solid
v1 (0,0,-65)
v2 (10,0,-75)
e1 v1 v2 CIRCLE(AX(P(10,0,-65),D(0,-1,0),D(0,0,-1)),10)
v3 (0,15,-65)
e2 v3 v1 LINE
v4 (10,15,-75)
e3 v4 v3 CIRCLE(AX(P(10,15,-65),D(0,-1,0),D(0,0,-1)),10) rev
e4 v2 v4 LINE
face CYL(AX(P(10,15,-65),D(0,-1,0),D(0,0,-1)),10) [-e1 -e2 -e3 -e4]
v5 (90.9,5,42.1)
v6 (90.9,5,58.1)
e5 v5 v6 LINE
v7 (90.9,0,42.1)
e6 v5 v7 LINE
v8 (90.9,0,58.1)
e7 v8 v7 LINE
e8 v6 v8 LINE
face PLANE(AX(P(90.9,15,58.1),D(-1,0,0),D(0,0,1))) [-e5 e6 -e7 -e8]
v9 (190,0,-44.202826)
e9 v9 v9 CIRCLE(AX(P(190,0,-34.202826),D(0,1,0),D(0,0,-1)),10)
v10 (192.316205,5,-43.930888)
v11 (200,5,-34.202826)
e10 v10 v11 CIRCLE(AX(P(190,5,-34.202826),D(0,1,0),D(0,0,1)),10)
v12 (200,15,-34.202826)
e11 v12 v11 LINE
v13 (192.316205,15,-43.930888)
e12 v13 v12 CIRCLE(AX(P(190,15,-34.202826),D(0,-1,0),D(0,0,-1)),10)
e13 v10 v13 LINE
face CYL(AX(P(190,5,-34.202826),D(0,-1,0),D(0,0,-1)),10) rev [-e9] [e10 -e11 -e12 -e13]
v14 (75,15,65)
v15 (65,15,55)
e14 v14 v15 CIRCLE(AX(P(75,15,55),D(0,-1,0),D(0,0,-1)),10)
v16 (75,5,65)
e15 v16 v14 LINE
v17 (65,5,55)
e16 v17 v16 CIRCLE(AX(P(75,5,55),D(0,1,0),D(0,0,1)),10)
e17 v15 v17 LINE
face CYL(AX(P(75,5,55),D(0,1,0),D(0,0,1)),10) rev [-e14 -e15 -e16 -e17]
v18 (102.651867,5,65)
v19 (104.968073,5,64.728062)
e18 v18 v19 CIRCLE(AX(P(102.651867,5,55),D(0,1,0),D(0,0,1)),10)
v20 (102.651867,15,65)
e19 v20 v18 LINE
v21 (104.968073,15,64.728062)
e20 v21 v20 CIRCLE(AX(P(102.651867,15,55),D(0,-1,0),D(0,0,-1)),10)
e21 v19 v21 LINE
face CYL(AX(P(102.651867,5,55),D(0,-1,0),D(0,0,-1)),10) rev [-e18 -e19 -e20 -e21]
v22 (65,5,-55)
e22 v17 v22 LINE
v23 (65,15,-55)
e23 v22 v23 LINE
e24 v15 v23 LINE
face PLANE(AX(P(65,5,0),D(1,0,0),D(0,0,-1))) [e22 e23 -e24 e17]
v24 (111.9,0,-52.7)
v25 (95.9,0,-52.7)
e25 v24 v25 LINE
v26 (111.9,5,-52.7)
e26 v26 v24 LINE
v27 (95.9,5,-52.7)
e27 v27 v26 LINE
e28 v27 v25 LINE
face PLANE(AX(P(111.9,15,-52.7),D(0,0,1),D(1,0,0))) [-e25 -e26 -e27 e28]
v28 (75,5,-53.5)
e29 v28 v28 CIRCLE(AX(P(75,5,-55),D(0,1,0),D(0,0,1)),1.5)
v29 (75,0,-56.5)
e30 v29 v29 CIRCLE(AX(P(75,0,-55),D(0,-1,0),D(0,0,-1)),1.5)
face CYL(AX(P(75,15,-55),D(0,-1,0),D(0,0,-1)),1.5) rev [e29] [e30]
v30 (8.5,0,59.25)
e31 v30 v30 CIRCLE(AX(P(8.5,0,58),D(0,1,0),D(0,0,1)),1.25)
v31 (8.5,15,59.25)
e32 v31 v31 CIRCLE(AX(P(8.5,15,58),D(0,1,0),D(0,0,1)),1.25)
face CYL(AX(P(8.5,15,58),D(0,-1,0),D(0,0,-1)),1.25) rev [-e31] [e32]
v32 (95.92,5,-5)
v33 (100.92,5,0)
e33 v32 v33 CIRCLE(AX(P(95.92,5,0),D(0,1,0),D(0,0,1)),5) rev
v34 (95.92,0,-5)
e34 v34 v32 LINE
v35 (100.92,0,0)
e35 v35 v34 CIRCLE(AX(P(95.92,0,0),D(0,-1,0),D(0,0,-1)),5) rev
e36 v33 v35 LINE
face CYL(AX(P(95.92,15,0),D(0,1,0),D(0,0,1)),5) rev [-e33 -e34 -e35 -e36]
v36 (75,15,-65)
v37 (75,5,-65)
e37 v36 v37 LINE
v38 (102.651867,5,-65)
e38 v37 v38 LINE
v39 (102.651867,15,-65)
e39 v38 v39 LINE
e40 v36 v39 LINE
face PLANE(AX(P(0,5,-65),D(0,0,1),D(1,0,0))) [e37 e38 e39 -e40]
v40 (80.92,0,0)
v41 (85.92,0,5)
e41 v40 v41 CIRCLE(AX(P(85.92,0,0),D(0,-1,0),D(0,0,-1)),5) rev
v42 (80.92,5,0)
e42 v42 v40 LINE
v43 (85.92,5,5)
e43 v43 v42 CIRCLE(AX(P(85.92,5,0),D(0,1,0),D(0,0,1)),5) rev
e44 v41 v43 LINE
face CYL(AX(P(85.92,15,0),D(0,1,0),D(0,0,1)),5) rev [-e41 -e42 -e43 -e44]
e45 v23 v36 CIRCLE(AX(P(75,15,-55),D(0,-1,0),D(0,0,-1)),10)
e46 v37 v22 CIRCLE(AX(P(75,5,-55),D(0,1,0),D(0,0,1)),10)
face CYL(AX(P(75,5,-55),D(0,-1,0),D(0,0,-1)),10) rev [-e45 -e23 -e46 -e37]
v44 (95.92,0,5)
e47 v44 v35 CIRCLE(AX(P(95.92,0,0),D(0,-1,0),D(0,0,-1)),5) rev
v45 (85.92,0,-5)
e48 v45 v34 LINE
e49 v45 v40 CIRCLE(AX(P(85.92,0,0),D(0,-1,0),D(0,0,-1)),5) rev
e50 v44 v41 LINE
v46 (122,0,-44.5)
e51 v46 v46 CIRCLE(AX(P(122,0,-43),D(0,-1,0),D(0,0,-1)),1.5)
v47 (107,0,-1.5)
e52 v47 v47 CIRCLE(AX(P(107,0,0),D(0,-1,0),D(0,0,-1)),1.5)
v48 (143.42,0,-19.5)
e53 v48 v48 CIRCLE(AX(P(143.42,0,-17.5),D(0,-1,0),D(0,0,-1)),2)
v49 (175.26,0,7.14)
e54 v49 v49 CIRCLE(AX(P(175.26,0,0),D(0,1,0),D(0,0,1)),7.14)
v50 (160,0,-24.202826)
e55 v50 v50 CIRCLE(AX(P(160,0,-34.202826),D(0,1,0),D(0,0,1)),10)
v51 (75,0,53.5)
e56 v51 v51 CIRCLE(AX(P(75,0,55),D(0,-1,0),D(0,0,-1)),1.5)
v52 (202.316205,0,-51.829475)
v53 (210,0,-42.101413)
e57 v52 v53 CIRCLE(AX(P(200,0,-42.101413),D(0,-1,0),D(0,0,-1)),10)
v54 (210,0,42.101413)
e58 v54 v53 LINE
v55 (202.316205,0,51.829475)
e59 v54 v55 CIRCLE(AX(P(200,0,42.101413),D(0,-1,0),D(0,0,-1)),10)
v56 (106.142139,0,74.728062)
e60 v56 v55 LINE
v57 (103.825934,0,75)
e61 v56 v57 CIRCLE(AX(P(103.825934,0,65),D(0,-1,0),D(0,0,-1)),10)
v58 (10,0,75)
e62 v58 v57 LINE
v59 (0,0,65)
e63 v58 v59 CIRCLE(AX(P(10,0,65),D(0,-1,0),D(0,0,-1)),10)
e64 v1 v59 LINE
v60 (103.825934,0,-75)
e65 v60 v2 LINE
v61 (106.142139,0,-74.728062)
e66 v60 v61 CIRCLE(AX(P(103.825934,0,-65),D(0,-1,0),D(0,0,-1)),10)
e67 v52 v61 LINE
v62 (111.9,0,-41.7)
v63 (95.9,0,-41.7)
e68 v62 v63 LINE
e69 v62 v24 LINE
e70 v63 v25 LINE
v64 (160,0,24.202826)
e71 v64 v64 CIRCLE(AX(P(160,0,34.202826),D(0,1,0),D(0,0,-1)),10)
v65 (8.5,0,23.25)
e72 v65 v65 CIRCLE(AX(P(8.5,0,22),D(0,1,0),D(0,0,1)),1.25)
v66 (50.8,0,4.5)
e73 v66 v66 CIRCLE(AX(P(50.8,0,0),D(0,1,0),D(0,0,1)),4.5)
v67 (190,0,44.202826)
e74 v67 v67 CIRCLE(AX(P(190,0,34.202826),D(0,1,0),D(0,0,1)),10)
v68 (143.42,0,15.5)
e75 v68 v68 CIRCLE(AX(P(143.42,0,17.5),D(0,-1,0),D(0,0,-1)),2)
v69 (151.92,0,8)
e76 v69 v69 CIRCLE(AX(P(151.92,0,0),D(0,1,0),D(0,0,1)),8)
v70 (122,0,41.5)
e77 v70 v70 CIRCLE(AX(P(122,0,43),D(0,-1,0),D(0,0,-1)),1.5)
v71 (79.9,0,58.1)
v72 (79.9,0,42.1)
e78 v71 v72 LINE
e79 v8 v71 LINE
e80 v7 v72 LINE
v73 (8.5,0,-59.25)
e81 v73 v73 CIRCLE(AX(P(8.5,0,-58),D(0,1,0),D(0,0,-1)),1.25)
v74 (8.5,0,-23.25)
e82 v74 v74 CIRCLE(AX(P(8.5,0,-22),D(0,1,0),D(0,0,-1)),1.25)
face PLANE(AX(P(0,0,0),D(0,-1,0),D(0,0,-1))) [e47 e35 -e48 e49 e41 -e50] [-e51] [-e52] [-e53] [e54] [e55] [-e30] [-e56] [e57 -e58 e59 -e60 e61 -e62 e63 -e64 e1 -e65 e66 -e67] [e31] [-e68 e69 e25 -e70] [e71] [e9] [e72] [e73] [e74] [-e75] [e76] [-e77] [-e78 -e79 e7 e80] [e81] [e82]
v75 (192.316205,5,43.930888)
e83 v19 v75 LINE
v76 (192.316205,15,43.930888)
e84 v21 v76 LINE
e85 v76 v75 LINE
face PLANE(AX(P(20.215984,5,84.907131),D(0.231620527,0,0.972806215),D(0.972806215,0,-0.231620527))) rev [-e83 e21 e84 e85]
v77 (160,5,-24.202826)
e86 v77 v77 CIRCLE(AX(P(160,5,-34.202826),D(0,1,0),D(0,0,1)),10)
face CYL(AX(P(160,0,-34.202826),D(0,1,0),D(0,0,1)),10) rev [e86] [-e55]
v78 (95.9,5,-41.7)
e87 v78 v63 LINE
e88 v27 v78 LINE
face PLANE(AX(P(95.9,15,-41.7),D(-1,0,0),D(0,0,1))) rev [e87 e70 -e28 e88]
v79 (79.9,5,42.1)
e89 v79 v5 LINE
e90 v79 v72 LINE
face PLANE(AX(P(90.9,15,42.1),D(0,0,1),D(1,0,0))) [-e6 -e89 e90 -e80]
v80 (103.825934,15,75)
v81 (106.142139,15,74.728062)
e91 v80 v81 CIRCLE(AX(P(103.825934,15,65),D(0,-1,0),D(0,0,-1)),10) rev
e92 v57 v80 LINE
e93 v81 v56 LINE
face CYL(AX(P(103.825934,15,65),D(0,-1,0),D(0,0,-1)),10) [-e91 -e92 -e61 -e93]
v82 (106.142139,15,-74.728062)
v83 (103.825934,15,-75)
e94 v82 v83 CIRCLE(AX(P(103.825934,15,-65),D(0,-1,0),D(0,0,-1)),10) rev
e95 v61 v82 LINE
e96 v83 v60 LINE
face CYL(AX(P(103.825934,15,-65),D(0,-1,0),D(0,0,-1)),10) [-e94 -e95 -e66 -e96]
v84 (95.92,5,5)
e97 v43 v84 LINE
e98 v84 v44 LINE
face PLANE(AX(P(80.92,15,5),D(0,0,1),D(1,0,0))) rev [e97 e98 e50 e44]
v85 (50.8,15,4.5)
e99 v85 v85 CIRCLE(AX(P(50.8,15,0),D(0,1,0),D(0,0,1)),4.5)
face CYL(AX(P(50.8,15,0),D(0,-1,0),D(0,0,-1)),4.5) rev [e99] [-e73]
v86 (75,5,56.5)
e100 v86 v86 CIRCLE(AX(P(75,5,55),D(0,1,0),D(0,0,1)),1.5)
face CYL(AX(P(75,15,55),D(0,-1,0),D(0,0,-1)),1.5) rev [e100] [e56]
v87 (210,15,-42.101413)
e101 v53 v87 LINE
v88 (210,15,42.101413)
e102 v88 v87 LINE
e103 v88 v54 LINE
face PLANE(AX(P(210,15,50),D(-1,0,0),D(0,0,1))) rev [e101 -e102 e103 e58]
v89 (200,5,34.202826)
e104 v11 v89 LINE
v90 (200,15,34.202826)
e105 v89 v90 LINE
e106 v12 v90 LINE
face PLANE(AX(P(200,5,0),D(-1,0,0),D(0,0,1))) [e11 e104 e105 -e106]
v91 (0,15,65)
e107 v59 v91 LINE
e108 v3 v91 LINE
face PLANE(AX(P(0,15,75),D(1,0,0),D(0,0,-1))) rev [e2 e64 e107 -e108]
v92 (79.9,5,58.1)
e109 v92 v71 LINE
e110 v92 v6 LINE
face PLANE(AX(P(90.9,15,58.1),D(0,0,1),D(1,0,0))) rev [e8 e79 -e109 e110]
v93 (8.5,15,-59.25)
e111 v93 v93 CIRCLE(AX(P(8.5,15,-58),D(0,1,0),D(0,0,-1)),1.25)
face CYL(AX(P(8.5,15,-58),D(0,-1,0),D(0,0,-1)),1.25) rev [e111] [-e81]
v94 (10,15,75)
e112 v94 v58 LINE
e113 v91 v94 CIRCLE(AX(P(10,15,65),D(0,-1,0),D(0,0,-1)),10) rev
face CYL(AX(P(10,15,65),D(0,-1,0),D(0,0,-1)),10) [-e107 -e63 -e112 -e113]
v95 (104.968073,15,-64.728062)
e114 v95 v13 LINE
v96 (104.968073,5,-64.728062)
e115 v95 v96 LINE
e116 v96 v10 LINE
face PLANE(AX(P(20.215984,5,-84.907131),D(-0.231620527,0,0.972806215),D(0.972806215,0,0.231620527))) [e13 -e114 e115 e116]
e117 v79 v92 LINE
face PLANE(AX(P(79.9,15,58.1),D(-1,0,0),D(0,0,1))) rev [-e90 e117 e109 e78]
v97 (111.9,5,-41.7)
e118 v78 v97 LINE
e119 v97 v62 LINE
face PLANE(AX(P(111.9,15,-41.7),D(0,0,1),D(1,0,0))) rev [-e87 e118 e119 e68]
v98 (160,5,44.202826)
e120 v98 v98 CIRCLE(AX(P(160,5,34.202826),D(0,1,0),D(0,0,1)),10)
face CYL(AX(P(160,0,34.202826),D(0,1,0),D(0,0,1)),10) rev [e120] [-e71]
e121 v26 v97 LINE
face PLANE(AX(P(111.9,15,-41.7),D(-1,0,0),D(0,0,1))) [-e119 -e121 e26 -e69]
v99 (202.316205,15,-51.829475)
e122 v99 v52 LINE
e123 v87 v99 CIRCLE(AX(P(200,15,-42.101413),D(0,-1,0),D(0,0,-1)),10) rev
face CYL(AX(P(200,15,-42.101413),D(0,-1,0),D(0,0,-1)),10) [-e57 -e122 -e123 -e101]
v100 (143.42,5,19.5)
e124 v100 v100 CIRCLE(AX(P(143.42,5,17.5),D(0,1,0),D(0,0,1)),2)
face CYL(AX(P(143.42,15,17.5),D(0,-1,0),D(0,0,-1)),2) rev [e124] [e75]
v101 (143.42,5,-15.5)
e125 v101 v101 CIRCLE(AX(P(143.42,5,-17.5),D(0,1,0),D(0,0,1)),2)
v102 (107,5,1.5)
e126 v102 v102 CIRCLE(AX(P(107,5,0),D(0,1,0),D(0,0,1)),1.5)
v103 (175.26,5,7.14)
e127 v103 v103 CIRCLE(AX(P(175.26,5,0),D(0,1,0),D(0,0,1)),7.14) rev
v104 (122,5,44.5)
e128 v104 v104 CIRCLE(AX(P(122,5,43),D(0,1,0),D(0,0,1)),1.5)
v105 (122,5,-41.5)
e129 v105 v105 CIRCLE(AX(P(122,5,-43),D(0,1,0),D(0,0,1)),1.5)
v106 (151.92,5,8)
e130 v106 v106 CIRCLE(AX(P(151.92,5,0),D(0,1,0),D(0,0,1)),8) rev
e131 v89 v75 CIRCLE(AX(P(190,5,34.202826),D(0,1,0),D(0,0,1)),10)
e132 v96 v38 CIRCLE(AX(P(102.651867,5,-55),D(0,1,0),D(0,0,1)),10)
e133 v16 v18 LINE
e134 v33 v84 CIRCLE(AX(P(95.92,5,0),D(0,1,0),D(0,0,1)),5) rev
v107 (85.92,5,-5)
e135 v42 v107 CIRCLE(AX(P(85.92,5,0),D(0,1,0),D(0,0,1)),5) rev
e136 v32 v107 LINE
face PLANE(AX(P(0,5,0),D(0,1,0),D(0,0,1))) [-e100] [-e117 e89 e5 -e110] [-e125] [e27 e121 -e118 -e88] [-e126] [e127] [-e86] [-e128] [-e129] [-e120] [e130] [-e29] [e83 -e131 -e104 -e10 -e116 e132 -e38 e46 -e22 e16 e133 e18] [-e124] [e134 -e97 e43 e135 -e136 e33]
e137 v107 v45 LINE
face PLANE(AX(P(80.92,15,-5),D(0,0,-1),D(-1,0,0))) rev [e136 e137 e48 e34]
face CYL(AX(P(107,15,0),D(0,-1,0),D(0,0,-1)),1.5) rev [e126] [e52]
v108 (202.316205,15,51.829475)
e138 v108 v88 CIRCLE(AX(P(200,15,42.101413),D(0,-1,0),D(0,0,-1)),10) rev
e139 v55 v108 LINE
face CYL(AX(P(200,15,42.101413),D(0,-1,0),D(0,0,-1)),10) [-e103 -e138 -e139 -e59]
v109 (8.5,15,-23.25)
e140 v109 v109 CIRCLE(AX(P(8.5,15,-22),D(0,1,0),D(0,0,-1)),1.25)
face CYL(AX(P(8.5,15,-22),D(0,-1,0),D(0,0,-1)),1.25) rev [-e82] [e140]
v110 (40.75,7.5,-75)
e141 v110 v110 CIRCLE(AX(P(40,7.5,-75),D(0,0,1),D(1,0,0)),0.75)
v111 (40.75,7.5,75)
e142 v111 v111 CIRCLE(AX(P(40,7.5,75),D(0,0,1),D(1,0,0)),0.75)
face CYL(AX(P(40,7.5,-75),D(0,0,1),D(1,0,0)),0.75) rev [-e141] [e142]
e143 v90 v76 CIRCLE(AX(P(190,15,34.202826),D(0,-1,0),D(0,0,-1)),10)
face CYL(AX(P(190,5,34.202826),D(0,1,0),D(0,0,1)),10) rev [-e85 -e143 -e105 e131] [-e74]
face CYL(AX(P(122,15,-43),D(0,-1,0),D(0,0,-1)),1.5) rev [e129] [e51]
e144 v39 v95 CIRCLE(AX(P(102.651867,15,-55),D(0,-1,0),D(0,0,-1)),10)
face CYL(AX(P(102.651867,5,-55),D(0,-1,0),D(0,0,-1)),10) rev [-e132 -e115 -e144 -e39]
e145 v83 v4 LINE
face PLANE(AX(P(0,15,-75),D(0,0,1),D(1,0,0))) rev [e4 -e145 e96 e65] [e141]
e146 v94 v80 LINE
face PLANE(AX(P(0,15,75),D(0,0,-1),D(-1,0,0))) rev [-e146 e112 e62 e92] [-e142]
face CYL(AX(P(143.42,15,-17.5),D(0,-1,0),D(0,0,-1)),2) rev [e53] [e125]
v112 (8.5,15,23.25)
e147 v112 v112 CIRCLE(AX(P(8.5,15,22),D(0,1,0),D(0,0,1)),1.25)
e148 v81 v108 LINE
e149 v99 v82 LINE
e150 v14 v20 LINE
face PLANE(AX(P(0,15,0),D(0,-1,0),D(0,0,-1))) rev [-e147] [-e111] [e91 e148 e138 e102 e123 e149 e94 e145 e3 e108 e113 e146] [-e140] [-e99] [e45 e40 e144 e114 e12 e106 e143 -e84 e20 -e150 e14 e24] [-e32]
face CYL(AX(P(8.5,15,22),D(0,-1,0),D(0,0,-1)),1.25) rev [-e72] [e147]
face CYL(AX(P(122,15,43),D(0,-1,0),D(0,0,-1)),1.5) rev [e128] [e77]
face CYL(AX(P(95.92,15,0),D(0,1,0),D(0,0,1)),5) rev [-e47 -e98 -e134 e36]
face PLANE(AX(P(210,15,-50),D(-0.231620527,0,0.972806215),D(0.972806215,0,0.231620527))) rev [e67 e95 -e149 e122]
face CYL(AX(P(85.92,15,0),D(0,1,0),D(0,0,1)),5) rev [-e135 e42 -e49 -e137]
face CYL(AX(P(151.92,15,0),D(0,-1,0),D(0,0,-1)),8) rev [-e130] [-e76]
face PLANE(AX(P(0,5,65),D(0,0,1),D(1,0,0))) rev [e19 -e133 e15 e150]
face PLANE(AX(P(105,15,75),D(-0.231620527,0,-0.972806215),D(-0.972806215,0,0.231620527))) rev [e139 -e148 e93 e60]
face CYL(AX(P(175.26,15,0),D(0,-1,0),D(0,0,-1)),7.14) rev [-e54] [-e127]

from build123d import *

# Parameters (mm, degrees)
ESBO_O1_R                = 4.5
ESBO_O1_R_2              = 7.14
ESBO_O1_R_3              = 8
ESBO_O1_R_4              = 1.25
RESSALTO_EXTRUS_O1_DEPTH = 15
CORTE_EXTRUS_O2_DEPTH    = 10
FILETE1_R                = 10
ESBO_O5_R                = 2
ESBO_O5_W                = 20
ESBO_O5_H                = 10
CORTE_EXTRUS_O4_DEPTH    = 224.494966386
FILETE2_R                = 5
ESBO_O6_R                = 10
CORTE_EXTRUS_O5_DEPTH    = 224.494966386
ESBO_O7_W                = 11
ESBO_O7_H                = 16
ESBO_O7_W_2              = 16
ESBO_O7_H_2              = 11
ESBO_O7_R                = 1.5
CORTE_EXTRUS_O6_DEPTH    = 224.494966386
ESBO_O8_R                = 0.75
CORTE_EXTRUS_O7_DEPTH    = 259.505319094


with BuildPart() as part:
    # Esboço1 → Ressalto-extrusão1 (new body)
    with BuildSketch(Plane(origin=(0, 0, 0), x_dir=(1, 0, 0), z_dir=(0, 1, 0))):
        Polygon((210, 50), (105, 75), (0, 75), (0, -75), (105, -75), (210, -50), align=None)
        with Locations(Location((50.8, 0, 0), (0, 0, 270))):
            Circle(ESBO_O1_R, mode=Mode.SUBTRACT)
        with Locations(Location((175.26, 0, 0), (0, 0, 270))):
            Circle(ESBO_O1_R_2, mode=Mode.SUBTRACT)
        with Locations(Location((151.92, 0, 0), (0, 0, 270))):
            Circle(ESBO_O1_R_3, mode=Mode.SUBTRACT)
        with Locations(Location((8.5, -58, 0), (0, 0, 270))):
            Circle(ESBO_O1_R_4, mode=Mode.SUBTRACT)
        with Locations(Location((8.5, -22, 0), (0, 0, 270))):
            Circle(ESBO_O1_R_4, mode=Mode.SUBTRACT)
        with Locations(Location((8.5, 22, 0), (0, 0, 90))):
            Circle(ESBO_O1_R_4, mode=Mode.SUBTRACT)
        with Locations(Location((8.5, 58, 0), (0, 0, 90))):
            Circle(ESBO_O1_R_4, mode=Mode.SUBTRACT)
    extrude(amount=RESSALTO_EXTRUS_O1_DEPTH)

    # Esboço3 → Corte-extrusão2 (cut)
    with BuildSketch(Plane(origin=(0, 15, 0), x_dir=(1, 0, 0), z_dir=(0, 1, 0))):
        Polygon((200, 42.101412788), (200, -42.101412788), (103.82593371, -65), (65, -65), (65, 65), (103.82593371, 65), align=None)
    extrude(amount=-CORTE_EXTRUS_O2_DEPTH, mode=Mode.SUBTRACT)

    # Filete1
    filete1_edges = [part.edges().sort_by_distance(p)[0] for p in [
        (0, 7.5, -75),
        (105, 7.5, -75),
        (210, 7.5, -50),
        (210, 7.5, 50),
        (105, 7.5, 75),
        (0, 7.5, 75),
        (65, 10, 65),
        (65, 10, -65),
        (103.82593371, 10, -65),
        (200, 10, -42.101412788),
        (200, 10, 42.101412788),
        (103.82593371, 10, 65),
    ]]
    fillet(filete1_edges, radius=FILETE1_R)

    # Esboço5 → Corte-extrusão4 (cut, through all)
    with BuildSketch(Plane.XZ):
        with Locations(Location((143.42, 17.5, 0), (0, 0, 270))):
            Circle(ESBO_O5_R)
        with Locations(Location((143.42, -17.5, 0), (0, 0, 270))):
            Circle(ESBO_O5_R)
        with Locations((90.92, 0)):
            Rectangle(ESBO_O5_W, ESBO_O5_H)
    extrude(amount=-CORTE_EXTRUS_O4_DEPTH, mode=Mode.SUBTRACT)

    # Filete2
    filete2_edges = [part.edges().sort_by_distance(p)[0] for p in [
        (80.92, 2.5, -5),
        (80.92, 2.5, 5),
        (100.92, 2.5, 5),
        (100.92, 2.5, -5),
    ]]
    fillet(filete2_edges, radius=FILETE2_R - 0.0001)  # a hair under: the kernel refuses the full size

    # Esboço6 → Corte-extrusão5 (cut, through all)
    with BuildSketch(Plane(origin=(0, 15, 0), x_dir=(1, 0, 0), z_dir=(0, 1, 0))):
        with Locations(Location((190, -34.202825576, 0), (0, 0, 270))):
            Circle(ESBO_O6_R)
        with Locations(Location((190, 34.202825576, 0), (0, 0, 90))):
            Circle(ESBO_O6_R)
        with Locations(Location((160, 34.202825576, 0), (0, 0, 270))):
            Circle(ESBO_O6_R)
        with Locations(Location((160, -34.202825576, 0), (0, 0, 270))):
            Circle(ESBO_O6_R)
    extrude(amount=-CORTE_EXTRUS_O5_DEPTH, mode=Mode.SUBTRACT)

    # Esboço7 → Corte-extrusão6 (cut, through all)
    with BuildSketch(Plane.XZ):
        with Locations((85.4, 50.1)):
            Rectangle(ESBO_O7_W, ESBO_O7_H)
        with Locations((103.9, -47.2)):
            Rectangle(ESBO_O7_W_2, ESBO_O7_H_2)
        with Locations(Location((75, 55, 0), (0, 0, 270))):
            Circle(ESBO_O7_R)
        with Locations(Location((122, 43, 0), (0, 0, 270))):
            Circle(ESBO_O7_R)
        with Locations(Location((107, 0, 0), (0, 0, 270))):
            Circle(ESBO_O7_R)
        with Locations(Location((75, -55, 0), (0, 0, 270))):
            Circle(ESBO_O7_R)
        with Locations(Location((122, -43, 0), (0, 0, 270))):
            Circle(ESBO_O7_R)
    extrude(amount=-CORTE_EXTRUS_O6_DEPTH, mode=Mode.SUBTRACT)

    # Esboço8 → Corte-extrusão7 (cut, through all)
    with BuildSketch(Plane.XY.offset(75)):
        with Locations((40, 7.5)):
            Circle(ESBO_O8_R)
    extrude(amount=-CORTE_EXTRUS_O7_DEPTH, mode=Mode.SUBTRACT)


solid = part.part
